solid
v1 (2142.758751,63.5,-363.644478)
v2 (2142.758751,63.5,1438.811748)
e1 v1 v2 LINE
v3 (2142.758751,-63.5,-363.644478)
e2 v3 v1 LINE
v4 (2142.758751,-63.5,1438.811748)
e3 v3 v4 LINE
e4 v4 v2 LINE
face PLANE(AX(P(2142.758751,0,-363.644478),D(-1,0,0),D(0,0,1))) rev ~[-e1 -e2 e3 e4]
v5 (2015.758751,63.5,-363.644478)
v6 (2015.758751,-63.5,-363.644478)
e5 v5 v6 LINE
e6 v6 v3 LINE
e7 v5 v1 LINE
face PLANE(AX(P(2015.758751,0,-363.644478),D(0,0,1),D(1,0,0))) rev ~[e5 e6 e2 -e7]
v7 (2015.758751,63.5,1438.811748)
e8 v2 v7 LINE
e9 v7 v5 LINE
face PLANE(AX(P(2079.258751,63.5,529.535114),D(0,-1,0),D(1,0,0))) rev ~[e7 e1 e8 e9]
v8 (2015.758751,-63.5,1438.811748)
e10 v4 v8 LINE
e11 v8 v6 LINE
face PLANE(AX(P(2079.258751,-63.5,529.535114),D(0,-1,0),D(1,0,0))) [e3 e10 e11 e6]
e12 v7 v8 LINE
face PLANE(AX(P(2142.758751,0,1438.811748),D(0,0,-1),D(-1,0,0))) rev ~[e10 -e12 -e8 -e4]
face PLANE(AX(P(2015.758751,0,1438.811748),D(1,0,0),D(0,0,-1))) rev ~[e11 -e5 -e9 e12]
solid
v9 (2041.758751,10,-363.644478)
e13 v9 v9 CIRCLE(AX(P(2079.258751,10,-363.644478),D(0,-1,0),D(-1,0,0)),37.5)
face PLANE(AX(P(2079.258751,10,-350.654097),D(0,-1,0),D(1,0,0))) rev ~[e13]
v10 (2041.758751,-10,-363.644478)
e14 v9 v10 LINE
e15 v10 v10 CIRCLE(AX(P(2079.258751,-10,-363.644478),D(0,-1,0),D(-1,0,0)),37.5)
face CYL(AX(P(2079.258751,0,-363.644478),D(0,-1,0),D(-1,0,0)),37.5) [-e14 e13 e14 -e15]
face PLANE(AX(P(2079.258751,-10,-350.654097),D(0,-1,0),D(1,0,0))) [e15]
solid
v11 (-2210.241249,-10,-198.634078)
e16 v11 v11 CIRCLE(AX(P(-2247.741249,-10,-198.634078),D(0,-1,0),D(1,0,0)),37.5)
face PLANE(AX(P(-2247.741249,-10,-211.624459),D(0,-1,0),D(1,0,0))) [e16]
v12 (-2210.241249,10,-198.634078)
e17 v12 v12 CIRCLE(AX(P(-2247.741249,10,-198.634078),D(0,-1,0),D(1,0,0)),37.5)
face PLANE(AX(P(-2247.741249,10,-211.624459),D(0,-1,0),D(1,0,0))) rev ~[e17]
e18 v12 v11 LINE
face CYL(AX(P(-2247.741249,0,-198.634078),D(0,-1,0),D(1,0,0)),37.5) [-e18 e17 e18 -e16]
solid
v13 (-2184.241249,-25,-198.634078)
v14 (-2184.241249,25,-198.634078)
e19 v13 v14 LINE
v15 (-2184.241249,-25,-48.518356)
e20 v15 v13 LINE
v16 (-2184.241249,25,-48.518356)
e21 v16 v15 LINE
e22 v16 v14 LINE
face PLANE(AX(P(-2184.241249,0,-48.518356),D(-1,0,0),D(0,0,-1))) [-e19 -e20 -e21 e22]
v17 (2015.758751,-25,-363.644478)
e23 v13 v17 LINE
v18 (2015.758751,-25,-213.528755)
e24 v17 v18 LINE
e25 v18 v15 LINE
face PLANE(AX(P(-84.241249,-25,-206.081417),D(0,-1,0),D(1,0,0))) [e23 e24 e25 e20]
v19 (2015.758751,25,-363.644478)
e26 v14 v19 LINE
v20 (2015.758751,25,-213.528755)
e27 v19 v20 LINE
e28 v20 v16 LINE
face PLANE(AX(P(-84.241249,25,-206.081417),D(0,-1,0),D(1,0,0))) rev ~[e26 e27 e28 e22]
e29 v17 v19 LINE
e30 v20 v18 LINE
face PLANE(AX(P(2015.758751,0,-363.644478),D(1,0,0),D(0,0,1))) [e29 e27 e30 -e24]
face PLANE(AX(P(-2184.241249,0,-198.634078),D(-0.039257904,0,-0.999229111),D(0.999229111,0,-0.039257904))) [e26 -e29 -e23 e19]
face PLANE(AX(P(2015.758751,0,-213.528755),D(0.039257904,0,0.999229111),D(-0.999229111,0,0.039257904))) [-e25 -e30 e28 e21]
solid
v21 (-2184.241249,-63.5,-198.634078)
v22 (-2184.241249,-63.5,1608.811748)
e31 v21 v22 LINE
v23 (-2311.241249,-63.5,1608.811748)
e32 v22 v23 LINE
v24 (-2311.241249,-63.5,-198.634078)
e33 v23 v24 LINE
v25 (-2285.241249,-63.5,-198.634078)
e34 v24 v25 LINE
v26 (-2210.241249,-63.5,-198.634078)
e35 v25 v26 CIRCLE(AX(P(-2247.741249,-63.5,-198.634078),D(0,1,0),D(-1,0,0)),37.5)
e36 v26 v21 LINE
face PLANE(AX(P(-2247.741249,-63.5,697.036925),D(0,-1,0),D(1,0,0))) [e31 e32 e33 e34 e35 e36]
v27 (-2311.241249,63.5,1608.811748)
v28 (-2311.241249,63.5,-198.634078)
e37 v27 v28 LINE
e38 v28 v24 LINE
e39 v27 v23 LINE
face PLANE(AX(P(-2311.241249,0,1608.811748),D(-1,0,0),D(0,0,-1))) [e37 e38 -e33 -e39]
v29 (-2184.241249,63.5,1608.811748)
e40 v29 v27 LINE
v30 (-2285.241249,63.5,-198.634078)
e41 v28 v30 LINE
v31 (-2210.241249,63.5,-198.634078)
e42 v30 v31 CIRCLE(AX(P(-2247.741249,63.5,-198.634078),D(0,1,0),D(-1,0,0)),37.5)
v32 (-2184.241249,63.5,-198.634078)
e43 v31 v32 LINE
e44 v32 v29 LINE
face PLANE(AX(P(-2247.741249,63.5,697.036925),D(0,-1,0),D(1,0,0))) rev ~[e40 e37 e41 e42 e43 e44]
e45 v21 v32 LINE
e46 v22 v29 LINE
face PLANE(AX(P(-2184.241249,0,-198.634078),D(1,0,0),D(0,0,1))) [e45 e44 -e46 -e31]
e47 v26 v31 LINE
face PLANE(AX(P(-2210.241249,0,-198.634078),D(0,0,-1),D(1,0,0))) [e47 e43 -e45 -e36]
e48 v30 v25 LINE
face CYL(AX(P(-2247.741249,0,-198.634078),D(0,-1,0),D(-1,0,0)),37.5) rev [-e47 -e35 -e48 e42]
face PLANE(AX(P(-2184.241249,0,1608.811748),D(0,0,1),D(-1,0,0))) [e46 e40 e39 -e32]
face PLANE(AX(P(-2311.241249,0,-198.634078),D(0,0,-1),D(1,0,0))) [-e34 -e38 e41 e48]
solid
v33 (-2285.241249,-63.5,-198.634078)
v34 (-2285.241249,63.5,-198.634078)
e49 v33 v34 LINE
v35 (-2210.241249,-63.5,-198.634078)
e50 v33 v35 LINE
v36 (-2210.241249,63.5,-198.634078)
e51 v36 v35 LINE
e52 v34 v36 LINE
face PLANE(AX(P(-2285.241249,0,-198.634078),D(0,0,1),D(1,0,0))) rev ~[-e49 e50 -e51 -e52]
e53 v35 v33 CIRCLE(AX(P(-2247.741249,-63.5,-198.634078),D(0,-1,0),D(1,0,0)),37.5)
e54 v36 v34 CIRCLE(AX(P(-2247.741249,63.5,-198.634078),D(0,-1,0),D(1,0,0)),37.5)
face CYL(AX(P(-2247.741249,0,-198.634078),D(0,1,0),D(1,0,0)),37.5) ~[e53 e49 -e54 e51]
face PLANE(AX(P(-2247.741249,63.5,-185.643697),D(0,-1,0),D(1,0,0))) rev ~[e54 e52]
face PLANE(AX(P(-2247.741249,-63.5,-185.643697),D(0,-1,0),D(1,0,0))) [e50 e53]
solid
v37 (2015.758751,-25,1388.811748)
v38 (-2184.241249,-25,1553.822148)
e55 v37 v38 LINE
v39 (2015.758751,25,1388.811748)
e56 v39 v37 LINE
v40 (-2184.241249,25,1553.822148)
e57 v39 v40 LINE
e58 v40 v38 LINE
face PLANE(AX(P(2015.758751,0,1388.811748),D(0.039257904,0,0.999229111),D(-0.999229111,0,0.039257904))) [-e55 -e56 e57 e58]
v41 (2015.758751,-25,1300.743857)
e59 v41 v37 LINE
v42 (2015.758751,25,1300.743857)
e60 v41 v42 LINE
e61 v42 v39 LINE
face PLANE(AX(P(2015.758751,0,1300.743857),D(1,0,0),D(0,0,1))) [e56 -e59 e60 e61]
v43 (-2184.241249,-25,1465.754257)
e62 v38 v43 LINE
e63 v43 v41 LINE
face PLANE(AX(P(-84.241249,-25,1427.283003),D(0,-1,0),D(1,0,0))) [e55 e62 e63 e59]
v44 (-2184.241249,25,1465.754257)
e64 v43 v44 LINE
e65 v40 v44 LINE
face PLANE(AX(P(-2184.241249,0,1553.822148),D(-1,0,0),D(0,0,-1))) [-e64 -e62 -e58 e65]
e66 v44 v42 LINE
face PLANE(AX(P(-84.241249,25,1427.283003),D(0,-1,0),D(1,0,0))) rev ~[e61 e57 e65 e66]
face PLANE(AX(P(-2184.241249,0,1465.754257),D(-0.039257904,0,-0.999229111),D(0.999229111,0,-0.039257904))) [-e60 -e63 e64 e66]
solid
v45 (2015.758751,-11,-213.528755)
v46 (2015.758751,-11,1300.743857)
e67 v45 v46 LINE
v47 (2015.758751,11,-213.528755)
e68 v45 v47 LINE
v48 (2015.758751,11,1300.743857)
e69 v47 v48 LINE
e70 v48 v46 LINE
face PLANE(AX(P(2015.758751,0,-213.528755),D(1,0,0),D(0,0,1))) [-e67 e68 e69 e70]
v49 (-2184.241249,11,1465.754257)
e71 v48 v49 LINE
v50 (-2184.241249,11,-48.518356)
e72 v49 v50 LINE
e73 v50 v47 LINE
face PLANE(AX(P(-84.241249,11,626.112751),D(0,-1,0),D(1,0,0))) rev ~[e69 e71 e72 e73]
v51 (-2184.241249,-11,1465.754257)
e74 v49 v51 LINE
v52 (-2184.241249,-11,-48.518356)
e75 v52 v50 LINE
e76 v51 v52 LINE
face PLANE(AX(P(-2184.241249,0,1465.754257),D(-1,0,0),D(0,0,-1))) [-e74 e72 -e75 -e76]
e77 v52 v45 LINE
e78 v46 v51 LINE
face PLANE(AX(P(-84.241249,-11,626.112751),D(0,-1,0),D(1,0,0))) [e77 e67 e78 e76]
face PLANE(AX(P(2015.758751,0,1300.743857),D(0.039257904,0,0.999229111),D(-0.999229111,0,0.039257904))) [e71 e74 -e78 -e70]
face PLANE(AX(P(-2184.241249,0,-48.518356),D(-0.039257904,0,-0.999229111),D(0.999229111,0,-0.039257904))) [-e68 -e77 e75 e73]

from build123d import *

# Parameters (mm, degrees)
F1_DEPTH      = 63.5
F1_DEPTH_BACK = 63.5
F2_DEPTH      = 10
F2_DEPTH_BACK = 10
F3_DEPTH      = 25
F3_DEPTH_BACK = 25
F4_DEPTH      = 11
F4_DEPTH_BACK = 11
F5_DEPTH      = 63.5
F5_DEPTH_BACK = 63.5


# Not quite as in the source:
# - a feature names something its author has since deleted; it is built from what else it names


with BuildPart() as f1:
    # F0 (on Front) → F1 (new body, two sides)
    with BuildSketch(Plane.XZ) as f1_sk:
        with BuildLine():
            Line((2142.7587509155, 1438.8117480311), (2015.7587509155, 1438.8117480311))
            Line((2015.7587509155, 1438.8117480311), (2015.7587509155, 1388.8117480311))
            Line((2015.7587509155, 1388.8117480311), (2015.7587509155, 1300.7438574954))
            Line((2015.7587509155, 1300.7438574954), (2015.7587509155, -213.5287553892))
            Line((2015.7587509155, -213.5287553892), (2015.7587509155, -363.6444778933))
            Line((2015.7587509155, -363.6444778933), (2041.7587509155, -363.6444778933))
            ThreePointArc((2041.7587509155, -363.6444778933), (2079.2587509155, -326.1444778933), (2116.7587509155, -363.6444778933))
            Line((2116.7587509155, -363.6444778933), (2142.7587509155, -363.6444778933))
            Line((2142.7587509155, -363.6444778933), (2142.7587509155, 1438.8117480311))
        make_face()
        with BuildLine():
            Line((2041.7587509155, -363.6444778933), (2116.7587509155, -363.6444778933))
            ThreePointArc((2116.7587509155, -363.6444778933), (2079.2587509155, -326.1444778933), (2041.7587509155, -363.6444778933))
        make_face()
    extrude(amount=-F1_DEPTH)
    extrude(f1_sk.sketch, amount=F1_DEPTH_BACK)


with BuildPart() as f1b:
    # F0 (on Front) → F1, piece 2 (new body, two sides)
    with BuildSketch(Plane.XZ) as f1_2_sk:
        with BuildLine():
            Line((-2285.2412490845, -198.6340780782), (-2210.2412490845, -198.6340780782))
            ThreePointArc((-2210.2412490845, -198.6340780782), (-2247.7412490845, -161.1340780782), (-2285.2412490845, -198.6340780782))
        make_face()
    extrude(amount=-F1_DEPTH)
    extrude(f1_2_sk.sketch, amount=F1_DEPTH_BACK)


with BuildPart() as f2:
    # F0 (on Front) → F2 (new body, two sides)
    with BuildSketch(Plane.XZ) as f2_sk:
        with BuildLine():
            ThreePointArc((-2285.2412490845, -198.6340780782), (-2247.7412490845, -236.1340780782), (-2210.2412490845, -198.6340780782))
            Line((-2210.2412490845, -198.6340780782), (-2285.2412490845, -198.6340780782))
        make_face()
        with BuildLine():
            Line((-2285.2412490845, -198.6340780782), (-2210.2412490845, -198.6340780782))
            ThreePointArc((-2210.2412490845, -198.6340780782), (-2247.7412490845, -161.1340780782), (-2285.2412490845, -198.6340780782))
        make_face()
    extrude(amount=F2_DEPTH)
    extrude(f2_sk.sketch, amount=-F2_DEPTH_BACK)


with BuildPart() as f2b:
    # F0 (on Front) → F2, piece 2 (new body, two sides)
    with BuildSketch(Plane.XZ) as f2_2_sk:
        with BuildLine():
            Line((2041.7587509155, -363.6444778933), (2116.7587509155, -363.6444778933))
            ThreePointArc((2116.7587509155, -363.6444778933), (2079.2587509155, -326.1444778933), (2041.7587509155, -363.6444778933))
        make_face()
        with BuildLine():
            ThreePointArc((2041.7587509155, -363.6444778933), (2079.2587509155, -401.1444778933), (2116.7587509155, -363.6444778933))
            Line((2116.7587509155, -363.6444778933), (2041.7587509155, -363.6444778933))
        make_face()
    extrude(amount=F2_DEPTH)
    extrude(f2_2_sk.sketch, amount=-F2_DEPTH_BACK)


with BuildPart() as f3:
    # F0 (on Front) → F3 (new body, two sides)
    with BuildSketch(Plane.XZ) as f3_sk:
        Polygon((2015.7587509155, -363.6444778933), (2015.7587509155, -213.5287553892), (-2184.2412490845, -48.5183555741), (-2184.2412490845, -198.6340780782), align=None)
    extrude(amount=F3_DEPTH)
    extrude(f3_sk.sketch, amount=-F3_DEPTH_BACK)


with BuildPart() as f3b:
    # F0 (on Front) → F3, piece 2 (new body, two sides)
    with BuildSketch(Plane.XZ) as f3_2_sk:
        Polygon((2015.7587509155, 1300.7438574954), (2015.7587509155, 1388.8117480311), (-2184.2412490845, 1553.8221478462), (-2184.2412490845, 1465.7542573105), align=None)
    extrude(amount=F3_DEPTH)
    extrude(f3_2_sk.sketch, amount=-F3_DEPTH_BACK)


with BuildPart() as f4:
    # F0 (on Front) → F4 (new body, two sides)
    with BuildSketch(Plane.XZ) as f4_sk:
        Polygon((2015.7587509155, -213.5287553892), (2015.7587509155, 1300.7438574954), (-2184.2412490845, 1465.7542573105), (-2184.2412490845, -48.5183555741), align=None)
    extrude(amount=F4_DEPTH)
    extrude(f4_sk.sketch, amount=-F4_DEPTH_BACK)


with BuildPart() as f5:
    # F0 (on Front) → F5 (new body, two sides)
    with BuildSketch(Plane.XZ) as f5_sk:
        with BuildLine():
            Line((-2184.2412490845, 1465.7542573105), (-2184.2412490845, 1553.8221478462))
            Line((-2184.2412490845, 1553.8221478462), (-2184.2412490845, 1603.8221478462))
            Line((-2184.2412490845, 1603.8221478462), (-2184.2412490845, 1608.8117480311))
            Line((-2184.2412490845, 1608.8117480311), (-2311.2412490845, 1608.8117480311))
            Line((-2311.2412490845, 1608.8117480311), (-2311.2412490845, -198.6340780782))
            Line((-2311.2412490845, -198.6340780782), (-2285.2412490845, -198.6340780782))
            ThreePointArc((-2285.2412490845, -198.6340780782), (-2247.7412490845, -161.1340780782), (-2210.2412490845, -198.6340780782))
            Line((-2210.2412490845, -198.6340780782), (-2184.2412490845, -198.6340780782))
            Line((-2184.2412490845, -198.6340780782), (-2184.2412490845, -48.5183555741))
            Line((-2184.2412490845, -48.5183555741), (-2184.2412490845, 1465.7542573105))
        make_face()
    extrude(amount=F5_DEPTH)
    extrude(f5_sk.sketch, amount=-F5_DEPTH_BACK)


solid = Compound([f1.part, f1b.part, f2.part, f2b.part, f3.part, f3b.part, f4.part, f5.part])
